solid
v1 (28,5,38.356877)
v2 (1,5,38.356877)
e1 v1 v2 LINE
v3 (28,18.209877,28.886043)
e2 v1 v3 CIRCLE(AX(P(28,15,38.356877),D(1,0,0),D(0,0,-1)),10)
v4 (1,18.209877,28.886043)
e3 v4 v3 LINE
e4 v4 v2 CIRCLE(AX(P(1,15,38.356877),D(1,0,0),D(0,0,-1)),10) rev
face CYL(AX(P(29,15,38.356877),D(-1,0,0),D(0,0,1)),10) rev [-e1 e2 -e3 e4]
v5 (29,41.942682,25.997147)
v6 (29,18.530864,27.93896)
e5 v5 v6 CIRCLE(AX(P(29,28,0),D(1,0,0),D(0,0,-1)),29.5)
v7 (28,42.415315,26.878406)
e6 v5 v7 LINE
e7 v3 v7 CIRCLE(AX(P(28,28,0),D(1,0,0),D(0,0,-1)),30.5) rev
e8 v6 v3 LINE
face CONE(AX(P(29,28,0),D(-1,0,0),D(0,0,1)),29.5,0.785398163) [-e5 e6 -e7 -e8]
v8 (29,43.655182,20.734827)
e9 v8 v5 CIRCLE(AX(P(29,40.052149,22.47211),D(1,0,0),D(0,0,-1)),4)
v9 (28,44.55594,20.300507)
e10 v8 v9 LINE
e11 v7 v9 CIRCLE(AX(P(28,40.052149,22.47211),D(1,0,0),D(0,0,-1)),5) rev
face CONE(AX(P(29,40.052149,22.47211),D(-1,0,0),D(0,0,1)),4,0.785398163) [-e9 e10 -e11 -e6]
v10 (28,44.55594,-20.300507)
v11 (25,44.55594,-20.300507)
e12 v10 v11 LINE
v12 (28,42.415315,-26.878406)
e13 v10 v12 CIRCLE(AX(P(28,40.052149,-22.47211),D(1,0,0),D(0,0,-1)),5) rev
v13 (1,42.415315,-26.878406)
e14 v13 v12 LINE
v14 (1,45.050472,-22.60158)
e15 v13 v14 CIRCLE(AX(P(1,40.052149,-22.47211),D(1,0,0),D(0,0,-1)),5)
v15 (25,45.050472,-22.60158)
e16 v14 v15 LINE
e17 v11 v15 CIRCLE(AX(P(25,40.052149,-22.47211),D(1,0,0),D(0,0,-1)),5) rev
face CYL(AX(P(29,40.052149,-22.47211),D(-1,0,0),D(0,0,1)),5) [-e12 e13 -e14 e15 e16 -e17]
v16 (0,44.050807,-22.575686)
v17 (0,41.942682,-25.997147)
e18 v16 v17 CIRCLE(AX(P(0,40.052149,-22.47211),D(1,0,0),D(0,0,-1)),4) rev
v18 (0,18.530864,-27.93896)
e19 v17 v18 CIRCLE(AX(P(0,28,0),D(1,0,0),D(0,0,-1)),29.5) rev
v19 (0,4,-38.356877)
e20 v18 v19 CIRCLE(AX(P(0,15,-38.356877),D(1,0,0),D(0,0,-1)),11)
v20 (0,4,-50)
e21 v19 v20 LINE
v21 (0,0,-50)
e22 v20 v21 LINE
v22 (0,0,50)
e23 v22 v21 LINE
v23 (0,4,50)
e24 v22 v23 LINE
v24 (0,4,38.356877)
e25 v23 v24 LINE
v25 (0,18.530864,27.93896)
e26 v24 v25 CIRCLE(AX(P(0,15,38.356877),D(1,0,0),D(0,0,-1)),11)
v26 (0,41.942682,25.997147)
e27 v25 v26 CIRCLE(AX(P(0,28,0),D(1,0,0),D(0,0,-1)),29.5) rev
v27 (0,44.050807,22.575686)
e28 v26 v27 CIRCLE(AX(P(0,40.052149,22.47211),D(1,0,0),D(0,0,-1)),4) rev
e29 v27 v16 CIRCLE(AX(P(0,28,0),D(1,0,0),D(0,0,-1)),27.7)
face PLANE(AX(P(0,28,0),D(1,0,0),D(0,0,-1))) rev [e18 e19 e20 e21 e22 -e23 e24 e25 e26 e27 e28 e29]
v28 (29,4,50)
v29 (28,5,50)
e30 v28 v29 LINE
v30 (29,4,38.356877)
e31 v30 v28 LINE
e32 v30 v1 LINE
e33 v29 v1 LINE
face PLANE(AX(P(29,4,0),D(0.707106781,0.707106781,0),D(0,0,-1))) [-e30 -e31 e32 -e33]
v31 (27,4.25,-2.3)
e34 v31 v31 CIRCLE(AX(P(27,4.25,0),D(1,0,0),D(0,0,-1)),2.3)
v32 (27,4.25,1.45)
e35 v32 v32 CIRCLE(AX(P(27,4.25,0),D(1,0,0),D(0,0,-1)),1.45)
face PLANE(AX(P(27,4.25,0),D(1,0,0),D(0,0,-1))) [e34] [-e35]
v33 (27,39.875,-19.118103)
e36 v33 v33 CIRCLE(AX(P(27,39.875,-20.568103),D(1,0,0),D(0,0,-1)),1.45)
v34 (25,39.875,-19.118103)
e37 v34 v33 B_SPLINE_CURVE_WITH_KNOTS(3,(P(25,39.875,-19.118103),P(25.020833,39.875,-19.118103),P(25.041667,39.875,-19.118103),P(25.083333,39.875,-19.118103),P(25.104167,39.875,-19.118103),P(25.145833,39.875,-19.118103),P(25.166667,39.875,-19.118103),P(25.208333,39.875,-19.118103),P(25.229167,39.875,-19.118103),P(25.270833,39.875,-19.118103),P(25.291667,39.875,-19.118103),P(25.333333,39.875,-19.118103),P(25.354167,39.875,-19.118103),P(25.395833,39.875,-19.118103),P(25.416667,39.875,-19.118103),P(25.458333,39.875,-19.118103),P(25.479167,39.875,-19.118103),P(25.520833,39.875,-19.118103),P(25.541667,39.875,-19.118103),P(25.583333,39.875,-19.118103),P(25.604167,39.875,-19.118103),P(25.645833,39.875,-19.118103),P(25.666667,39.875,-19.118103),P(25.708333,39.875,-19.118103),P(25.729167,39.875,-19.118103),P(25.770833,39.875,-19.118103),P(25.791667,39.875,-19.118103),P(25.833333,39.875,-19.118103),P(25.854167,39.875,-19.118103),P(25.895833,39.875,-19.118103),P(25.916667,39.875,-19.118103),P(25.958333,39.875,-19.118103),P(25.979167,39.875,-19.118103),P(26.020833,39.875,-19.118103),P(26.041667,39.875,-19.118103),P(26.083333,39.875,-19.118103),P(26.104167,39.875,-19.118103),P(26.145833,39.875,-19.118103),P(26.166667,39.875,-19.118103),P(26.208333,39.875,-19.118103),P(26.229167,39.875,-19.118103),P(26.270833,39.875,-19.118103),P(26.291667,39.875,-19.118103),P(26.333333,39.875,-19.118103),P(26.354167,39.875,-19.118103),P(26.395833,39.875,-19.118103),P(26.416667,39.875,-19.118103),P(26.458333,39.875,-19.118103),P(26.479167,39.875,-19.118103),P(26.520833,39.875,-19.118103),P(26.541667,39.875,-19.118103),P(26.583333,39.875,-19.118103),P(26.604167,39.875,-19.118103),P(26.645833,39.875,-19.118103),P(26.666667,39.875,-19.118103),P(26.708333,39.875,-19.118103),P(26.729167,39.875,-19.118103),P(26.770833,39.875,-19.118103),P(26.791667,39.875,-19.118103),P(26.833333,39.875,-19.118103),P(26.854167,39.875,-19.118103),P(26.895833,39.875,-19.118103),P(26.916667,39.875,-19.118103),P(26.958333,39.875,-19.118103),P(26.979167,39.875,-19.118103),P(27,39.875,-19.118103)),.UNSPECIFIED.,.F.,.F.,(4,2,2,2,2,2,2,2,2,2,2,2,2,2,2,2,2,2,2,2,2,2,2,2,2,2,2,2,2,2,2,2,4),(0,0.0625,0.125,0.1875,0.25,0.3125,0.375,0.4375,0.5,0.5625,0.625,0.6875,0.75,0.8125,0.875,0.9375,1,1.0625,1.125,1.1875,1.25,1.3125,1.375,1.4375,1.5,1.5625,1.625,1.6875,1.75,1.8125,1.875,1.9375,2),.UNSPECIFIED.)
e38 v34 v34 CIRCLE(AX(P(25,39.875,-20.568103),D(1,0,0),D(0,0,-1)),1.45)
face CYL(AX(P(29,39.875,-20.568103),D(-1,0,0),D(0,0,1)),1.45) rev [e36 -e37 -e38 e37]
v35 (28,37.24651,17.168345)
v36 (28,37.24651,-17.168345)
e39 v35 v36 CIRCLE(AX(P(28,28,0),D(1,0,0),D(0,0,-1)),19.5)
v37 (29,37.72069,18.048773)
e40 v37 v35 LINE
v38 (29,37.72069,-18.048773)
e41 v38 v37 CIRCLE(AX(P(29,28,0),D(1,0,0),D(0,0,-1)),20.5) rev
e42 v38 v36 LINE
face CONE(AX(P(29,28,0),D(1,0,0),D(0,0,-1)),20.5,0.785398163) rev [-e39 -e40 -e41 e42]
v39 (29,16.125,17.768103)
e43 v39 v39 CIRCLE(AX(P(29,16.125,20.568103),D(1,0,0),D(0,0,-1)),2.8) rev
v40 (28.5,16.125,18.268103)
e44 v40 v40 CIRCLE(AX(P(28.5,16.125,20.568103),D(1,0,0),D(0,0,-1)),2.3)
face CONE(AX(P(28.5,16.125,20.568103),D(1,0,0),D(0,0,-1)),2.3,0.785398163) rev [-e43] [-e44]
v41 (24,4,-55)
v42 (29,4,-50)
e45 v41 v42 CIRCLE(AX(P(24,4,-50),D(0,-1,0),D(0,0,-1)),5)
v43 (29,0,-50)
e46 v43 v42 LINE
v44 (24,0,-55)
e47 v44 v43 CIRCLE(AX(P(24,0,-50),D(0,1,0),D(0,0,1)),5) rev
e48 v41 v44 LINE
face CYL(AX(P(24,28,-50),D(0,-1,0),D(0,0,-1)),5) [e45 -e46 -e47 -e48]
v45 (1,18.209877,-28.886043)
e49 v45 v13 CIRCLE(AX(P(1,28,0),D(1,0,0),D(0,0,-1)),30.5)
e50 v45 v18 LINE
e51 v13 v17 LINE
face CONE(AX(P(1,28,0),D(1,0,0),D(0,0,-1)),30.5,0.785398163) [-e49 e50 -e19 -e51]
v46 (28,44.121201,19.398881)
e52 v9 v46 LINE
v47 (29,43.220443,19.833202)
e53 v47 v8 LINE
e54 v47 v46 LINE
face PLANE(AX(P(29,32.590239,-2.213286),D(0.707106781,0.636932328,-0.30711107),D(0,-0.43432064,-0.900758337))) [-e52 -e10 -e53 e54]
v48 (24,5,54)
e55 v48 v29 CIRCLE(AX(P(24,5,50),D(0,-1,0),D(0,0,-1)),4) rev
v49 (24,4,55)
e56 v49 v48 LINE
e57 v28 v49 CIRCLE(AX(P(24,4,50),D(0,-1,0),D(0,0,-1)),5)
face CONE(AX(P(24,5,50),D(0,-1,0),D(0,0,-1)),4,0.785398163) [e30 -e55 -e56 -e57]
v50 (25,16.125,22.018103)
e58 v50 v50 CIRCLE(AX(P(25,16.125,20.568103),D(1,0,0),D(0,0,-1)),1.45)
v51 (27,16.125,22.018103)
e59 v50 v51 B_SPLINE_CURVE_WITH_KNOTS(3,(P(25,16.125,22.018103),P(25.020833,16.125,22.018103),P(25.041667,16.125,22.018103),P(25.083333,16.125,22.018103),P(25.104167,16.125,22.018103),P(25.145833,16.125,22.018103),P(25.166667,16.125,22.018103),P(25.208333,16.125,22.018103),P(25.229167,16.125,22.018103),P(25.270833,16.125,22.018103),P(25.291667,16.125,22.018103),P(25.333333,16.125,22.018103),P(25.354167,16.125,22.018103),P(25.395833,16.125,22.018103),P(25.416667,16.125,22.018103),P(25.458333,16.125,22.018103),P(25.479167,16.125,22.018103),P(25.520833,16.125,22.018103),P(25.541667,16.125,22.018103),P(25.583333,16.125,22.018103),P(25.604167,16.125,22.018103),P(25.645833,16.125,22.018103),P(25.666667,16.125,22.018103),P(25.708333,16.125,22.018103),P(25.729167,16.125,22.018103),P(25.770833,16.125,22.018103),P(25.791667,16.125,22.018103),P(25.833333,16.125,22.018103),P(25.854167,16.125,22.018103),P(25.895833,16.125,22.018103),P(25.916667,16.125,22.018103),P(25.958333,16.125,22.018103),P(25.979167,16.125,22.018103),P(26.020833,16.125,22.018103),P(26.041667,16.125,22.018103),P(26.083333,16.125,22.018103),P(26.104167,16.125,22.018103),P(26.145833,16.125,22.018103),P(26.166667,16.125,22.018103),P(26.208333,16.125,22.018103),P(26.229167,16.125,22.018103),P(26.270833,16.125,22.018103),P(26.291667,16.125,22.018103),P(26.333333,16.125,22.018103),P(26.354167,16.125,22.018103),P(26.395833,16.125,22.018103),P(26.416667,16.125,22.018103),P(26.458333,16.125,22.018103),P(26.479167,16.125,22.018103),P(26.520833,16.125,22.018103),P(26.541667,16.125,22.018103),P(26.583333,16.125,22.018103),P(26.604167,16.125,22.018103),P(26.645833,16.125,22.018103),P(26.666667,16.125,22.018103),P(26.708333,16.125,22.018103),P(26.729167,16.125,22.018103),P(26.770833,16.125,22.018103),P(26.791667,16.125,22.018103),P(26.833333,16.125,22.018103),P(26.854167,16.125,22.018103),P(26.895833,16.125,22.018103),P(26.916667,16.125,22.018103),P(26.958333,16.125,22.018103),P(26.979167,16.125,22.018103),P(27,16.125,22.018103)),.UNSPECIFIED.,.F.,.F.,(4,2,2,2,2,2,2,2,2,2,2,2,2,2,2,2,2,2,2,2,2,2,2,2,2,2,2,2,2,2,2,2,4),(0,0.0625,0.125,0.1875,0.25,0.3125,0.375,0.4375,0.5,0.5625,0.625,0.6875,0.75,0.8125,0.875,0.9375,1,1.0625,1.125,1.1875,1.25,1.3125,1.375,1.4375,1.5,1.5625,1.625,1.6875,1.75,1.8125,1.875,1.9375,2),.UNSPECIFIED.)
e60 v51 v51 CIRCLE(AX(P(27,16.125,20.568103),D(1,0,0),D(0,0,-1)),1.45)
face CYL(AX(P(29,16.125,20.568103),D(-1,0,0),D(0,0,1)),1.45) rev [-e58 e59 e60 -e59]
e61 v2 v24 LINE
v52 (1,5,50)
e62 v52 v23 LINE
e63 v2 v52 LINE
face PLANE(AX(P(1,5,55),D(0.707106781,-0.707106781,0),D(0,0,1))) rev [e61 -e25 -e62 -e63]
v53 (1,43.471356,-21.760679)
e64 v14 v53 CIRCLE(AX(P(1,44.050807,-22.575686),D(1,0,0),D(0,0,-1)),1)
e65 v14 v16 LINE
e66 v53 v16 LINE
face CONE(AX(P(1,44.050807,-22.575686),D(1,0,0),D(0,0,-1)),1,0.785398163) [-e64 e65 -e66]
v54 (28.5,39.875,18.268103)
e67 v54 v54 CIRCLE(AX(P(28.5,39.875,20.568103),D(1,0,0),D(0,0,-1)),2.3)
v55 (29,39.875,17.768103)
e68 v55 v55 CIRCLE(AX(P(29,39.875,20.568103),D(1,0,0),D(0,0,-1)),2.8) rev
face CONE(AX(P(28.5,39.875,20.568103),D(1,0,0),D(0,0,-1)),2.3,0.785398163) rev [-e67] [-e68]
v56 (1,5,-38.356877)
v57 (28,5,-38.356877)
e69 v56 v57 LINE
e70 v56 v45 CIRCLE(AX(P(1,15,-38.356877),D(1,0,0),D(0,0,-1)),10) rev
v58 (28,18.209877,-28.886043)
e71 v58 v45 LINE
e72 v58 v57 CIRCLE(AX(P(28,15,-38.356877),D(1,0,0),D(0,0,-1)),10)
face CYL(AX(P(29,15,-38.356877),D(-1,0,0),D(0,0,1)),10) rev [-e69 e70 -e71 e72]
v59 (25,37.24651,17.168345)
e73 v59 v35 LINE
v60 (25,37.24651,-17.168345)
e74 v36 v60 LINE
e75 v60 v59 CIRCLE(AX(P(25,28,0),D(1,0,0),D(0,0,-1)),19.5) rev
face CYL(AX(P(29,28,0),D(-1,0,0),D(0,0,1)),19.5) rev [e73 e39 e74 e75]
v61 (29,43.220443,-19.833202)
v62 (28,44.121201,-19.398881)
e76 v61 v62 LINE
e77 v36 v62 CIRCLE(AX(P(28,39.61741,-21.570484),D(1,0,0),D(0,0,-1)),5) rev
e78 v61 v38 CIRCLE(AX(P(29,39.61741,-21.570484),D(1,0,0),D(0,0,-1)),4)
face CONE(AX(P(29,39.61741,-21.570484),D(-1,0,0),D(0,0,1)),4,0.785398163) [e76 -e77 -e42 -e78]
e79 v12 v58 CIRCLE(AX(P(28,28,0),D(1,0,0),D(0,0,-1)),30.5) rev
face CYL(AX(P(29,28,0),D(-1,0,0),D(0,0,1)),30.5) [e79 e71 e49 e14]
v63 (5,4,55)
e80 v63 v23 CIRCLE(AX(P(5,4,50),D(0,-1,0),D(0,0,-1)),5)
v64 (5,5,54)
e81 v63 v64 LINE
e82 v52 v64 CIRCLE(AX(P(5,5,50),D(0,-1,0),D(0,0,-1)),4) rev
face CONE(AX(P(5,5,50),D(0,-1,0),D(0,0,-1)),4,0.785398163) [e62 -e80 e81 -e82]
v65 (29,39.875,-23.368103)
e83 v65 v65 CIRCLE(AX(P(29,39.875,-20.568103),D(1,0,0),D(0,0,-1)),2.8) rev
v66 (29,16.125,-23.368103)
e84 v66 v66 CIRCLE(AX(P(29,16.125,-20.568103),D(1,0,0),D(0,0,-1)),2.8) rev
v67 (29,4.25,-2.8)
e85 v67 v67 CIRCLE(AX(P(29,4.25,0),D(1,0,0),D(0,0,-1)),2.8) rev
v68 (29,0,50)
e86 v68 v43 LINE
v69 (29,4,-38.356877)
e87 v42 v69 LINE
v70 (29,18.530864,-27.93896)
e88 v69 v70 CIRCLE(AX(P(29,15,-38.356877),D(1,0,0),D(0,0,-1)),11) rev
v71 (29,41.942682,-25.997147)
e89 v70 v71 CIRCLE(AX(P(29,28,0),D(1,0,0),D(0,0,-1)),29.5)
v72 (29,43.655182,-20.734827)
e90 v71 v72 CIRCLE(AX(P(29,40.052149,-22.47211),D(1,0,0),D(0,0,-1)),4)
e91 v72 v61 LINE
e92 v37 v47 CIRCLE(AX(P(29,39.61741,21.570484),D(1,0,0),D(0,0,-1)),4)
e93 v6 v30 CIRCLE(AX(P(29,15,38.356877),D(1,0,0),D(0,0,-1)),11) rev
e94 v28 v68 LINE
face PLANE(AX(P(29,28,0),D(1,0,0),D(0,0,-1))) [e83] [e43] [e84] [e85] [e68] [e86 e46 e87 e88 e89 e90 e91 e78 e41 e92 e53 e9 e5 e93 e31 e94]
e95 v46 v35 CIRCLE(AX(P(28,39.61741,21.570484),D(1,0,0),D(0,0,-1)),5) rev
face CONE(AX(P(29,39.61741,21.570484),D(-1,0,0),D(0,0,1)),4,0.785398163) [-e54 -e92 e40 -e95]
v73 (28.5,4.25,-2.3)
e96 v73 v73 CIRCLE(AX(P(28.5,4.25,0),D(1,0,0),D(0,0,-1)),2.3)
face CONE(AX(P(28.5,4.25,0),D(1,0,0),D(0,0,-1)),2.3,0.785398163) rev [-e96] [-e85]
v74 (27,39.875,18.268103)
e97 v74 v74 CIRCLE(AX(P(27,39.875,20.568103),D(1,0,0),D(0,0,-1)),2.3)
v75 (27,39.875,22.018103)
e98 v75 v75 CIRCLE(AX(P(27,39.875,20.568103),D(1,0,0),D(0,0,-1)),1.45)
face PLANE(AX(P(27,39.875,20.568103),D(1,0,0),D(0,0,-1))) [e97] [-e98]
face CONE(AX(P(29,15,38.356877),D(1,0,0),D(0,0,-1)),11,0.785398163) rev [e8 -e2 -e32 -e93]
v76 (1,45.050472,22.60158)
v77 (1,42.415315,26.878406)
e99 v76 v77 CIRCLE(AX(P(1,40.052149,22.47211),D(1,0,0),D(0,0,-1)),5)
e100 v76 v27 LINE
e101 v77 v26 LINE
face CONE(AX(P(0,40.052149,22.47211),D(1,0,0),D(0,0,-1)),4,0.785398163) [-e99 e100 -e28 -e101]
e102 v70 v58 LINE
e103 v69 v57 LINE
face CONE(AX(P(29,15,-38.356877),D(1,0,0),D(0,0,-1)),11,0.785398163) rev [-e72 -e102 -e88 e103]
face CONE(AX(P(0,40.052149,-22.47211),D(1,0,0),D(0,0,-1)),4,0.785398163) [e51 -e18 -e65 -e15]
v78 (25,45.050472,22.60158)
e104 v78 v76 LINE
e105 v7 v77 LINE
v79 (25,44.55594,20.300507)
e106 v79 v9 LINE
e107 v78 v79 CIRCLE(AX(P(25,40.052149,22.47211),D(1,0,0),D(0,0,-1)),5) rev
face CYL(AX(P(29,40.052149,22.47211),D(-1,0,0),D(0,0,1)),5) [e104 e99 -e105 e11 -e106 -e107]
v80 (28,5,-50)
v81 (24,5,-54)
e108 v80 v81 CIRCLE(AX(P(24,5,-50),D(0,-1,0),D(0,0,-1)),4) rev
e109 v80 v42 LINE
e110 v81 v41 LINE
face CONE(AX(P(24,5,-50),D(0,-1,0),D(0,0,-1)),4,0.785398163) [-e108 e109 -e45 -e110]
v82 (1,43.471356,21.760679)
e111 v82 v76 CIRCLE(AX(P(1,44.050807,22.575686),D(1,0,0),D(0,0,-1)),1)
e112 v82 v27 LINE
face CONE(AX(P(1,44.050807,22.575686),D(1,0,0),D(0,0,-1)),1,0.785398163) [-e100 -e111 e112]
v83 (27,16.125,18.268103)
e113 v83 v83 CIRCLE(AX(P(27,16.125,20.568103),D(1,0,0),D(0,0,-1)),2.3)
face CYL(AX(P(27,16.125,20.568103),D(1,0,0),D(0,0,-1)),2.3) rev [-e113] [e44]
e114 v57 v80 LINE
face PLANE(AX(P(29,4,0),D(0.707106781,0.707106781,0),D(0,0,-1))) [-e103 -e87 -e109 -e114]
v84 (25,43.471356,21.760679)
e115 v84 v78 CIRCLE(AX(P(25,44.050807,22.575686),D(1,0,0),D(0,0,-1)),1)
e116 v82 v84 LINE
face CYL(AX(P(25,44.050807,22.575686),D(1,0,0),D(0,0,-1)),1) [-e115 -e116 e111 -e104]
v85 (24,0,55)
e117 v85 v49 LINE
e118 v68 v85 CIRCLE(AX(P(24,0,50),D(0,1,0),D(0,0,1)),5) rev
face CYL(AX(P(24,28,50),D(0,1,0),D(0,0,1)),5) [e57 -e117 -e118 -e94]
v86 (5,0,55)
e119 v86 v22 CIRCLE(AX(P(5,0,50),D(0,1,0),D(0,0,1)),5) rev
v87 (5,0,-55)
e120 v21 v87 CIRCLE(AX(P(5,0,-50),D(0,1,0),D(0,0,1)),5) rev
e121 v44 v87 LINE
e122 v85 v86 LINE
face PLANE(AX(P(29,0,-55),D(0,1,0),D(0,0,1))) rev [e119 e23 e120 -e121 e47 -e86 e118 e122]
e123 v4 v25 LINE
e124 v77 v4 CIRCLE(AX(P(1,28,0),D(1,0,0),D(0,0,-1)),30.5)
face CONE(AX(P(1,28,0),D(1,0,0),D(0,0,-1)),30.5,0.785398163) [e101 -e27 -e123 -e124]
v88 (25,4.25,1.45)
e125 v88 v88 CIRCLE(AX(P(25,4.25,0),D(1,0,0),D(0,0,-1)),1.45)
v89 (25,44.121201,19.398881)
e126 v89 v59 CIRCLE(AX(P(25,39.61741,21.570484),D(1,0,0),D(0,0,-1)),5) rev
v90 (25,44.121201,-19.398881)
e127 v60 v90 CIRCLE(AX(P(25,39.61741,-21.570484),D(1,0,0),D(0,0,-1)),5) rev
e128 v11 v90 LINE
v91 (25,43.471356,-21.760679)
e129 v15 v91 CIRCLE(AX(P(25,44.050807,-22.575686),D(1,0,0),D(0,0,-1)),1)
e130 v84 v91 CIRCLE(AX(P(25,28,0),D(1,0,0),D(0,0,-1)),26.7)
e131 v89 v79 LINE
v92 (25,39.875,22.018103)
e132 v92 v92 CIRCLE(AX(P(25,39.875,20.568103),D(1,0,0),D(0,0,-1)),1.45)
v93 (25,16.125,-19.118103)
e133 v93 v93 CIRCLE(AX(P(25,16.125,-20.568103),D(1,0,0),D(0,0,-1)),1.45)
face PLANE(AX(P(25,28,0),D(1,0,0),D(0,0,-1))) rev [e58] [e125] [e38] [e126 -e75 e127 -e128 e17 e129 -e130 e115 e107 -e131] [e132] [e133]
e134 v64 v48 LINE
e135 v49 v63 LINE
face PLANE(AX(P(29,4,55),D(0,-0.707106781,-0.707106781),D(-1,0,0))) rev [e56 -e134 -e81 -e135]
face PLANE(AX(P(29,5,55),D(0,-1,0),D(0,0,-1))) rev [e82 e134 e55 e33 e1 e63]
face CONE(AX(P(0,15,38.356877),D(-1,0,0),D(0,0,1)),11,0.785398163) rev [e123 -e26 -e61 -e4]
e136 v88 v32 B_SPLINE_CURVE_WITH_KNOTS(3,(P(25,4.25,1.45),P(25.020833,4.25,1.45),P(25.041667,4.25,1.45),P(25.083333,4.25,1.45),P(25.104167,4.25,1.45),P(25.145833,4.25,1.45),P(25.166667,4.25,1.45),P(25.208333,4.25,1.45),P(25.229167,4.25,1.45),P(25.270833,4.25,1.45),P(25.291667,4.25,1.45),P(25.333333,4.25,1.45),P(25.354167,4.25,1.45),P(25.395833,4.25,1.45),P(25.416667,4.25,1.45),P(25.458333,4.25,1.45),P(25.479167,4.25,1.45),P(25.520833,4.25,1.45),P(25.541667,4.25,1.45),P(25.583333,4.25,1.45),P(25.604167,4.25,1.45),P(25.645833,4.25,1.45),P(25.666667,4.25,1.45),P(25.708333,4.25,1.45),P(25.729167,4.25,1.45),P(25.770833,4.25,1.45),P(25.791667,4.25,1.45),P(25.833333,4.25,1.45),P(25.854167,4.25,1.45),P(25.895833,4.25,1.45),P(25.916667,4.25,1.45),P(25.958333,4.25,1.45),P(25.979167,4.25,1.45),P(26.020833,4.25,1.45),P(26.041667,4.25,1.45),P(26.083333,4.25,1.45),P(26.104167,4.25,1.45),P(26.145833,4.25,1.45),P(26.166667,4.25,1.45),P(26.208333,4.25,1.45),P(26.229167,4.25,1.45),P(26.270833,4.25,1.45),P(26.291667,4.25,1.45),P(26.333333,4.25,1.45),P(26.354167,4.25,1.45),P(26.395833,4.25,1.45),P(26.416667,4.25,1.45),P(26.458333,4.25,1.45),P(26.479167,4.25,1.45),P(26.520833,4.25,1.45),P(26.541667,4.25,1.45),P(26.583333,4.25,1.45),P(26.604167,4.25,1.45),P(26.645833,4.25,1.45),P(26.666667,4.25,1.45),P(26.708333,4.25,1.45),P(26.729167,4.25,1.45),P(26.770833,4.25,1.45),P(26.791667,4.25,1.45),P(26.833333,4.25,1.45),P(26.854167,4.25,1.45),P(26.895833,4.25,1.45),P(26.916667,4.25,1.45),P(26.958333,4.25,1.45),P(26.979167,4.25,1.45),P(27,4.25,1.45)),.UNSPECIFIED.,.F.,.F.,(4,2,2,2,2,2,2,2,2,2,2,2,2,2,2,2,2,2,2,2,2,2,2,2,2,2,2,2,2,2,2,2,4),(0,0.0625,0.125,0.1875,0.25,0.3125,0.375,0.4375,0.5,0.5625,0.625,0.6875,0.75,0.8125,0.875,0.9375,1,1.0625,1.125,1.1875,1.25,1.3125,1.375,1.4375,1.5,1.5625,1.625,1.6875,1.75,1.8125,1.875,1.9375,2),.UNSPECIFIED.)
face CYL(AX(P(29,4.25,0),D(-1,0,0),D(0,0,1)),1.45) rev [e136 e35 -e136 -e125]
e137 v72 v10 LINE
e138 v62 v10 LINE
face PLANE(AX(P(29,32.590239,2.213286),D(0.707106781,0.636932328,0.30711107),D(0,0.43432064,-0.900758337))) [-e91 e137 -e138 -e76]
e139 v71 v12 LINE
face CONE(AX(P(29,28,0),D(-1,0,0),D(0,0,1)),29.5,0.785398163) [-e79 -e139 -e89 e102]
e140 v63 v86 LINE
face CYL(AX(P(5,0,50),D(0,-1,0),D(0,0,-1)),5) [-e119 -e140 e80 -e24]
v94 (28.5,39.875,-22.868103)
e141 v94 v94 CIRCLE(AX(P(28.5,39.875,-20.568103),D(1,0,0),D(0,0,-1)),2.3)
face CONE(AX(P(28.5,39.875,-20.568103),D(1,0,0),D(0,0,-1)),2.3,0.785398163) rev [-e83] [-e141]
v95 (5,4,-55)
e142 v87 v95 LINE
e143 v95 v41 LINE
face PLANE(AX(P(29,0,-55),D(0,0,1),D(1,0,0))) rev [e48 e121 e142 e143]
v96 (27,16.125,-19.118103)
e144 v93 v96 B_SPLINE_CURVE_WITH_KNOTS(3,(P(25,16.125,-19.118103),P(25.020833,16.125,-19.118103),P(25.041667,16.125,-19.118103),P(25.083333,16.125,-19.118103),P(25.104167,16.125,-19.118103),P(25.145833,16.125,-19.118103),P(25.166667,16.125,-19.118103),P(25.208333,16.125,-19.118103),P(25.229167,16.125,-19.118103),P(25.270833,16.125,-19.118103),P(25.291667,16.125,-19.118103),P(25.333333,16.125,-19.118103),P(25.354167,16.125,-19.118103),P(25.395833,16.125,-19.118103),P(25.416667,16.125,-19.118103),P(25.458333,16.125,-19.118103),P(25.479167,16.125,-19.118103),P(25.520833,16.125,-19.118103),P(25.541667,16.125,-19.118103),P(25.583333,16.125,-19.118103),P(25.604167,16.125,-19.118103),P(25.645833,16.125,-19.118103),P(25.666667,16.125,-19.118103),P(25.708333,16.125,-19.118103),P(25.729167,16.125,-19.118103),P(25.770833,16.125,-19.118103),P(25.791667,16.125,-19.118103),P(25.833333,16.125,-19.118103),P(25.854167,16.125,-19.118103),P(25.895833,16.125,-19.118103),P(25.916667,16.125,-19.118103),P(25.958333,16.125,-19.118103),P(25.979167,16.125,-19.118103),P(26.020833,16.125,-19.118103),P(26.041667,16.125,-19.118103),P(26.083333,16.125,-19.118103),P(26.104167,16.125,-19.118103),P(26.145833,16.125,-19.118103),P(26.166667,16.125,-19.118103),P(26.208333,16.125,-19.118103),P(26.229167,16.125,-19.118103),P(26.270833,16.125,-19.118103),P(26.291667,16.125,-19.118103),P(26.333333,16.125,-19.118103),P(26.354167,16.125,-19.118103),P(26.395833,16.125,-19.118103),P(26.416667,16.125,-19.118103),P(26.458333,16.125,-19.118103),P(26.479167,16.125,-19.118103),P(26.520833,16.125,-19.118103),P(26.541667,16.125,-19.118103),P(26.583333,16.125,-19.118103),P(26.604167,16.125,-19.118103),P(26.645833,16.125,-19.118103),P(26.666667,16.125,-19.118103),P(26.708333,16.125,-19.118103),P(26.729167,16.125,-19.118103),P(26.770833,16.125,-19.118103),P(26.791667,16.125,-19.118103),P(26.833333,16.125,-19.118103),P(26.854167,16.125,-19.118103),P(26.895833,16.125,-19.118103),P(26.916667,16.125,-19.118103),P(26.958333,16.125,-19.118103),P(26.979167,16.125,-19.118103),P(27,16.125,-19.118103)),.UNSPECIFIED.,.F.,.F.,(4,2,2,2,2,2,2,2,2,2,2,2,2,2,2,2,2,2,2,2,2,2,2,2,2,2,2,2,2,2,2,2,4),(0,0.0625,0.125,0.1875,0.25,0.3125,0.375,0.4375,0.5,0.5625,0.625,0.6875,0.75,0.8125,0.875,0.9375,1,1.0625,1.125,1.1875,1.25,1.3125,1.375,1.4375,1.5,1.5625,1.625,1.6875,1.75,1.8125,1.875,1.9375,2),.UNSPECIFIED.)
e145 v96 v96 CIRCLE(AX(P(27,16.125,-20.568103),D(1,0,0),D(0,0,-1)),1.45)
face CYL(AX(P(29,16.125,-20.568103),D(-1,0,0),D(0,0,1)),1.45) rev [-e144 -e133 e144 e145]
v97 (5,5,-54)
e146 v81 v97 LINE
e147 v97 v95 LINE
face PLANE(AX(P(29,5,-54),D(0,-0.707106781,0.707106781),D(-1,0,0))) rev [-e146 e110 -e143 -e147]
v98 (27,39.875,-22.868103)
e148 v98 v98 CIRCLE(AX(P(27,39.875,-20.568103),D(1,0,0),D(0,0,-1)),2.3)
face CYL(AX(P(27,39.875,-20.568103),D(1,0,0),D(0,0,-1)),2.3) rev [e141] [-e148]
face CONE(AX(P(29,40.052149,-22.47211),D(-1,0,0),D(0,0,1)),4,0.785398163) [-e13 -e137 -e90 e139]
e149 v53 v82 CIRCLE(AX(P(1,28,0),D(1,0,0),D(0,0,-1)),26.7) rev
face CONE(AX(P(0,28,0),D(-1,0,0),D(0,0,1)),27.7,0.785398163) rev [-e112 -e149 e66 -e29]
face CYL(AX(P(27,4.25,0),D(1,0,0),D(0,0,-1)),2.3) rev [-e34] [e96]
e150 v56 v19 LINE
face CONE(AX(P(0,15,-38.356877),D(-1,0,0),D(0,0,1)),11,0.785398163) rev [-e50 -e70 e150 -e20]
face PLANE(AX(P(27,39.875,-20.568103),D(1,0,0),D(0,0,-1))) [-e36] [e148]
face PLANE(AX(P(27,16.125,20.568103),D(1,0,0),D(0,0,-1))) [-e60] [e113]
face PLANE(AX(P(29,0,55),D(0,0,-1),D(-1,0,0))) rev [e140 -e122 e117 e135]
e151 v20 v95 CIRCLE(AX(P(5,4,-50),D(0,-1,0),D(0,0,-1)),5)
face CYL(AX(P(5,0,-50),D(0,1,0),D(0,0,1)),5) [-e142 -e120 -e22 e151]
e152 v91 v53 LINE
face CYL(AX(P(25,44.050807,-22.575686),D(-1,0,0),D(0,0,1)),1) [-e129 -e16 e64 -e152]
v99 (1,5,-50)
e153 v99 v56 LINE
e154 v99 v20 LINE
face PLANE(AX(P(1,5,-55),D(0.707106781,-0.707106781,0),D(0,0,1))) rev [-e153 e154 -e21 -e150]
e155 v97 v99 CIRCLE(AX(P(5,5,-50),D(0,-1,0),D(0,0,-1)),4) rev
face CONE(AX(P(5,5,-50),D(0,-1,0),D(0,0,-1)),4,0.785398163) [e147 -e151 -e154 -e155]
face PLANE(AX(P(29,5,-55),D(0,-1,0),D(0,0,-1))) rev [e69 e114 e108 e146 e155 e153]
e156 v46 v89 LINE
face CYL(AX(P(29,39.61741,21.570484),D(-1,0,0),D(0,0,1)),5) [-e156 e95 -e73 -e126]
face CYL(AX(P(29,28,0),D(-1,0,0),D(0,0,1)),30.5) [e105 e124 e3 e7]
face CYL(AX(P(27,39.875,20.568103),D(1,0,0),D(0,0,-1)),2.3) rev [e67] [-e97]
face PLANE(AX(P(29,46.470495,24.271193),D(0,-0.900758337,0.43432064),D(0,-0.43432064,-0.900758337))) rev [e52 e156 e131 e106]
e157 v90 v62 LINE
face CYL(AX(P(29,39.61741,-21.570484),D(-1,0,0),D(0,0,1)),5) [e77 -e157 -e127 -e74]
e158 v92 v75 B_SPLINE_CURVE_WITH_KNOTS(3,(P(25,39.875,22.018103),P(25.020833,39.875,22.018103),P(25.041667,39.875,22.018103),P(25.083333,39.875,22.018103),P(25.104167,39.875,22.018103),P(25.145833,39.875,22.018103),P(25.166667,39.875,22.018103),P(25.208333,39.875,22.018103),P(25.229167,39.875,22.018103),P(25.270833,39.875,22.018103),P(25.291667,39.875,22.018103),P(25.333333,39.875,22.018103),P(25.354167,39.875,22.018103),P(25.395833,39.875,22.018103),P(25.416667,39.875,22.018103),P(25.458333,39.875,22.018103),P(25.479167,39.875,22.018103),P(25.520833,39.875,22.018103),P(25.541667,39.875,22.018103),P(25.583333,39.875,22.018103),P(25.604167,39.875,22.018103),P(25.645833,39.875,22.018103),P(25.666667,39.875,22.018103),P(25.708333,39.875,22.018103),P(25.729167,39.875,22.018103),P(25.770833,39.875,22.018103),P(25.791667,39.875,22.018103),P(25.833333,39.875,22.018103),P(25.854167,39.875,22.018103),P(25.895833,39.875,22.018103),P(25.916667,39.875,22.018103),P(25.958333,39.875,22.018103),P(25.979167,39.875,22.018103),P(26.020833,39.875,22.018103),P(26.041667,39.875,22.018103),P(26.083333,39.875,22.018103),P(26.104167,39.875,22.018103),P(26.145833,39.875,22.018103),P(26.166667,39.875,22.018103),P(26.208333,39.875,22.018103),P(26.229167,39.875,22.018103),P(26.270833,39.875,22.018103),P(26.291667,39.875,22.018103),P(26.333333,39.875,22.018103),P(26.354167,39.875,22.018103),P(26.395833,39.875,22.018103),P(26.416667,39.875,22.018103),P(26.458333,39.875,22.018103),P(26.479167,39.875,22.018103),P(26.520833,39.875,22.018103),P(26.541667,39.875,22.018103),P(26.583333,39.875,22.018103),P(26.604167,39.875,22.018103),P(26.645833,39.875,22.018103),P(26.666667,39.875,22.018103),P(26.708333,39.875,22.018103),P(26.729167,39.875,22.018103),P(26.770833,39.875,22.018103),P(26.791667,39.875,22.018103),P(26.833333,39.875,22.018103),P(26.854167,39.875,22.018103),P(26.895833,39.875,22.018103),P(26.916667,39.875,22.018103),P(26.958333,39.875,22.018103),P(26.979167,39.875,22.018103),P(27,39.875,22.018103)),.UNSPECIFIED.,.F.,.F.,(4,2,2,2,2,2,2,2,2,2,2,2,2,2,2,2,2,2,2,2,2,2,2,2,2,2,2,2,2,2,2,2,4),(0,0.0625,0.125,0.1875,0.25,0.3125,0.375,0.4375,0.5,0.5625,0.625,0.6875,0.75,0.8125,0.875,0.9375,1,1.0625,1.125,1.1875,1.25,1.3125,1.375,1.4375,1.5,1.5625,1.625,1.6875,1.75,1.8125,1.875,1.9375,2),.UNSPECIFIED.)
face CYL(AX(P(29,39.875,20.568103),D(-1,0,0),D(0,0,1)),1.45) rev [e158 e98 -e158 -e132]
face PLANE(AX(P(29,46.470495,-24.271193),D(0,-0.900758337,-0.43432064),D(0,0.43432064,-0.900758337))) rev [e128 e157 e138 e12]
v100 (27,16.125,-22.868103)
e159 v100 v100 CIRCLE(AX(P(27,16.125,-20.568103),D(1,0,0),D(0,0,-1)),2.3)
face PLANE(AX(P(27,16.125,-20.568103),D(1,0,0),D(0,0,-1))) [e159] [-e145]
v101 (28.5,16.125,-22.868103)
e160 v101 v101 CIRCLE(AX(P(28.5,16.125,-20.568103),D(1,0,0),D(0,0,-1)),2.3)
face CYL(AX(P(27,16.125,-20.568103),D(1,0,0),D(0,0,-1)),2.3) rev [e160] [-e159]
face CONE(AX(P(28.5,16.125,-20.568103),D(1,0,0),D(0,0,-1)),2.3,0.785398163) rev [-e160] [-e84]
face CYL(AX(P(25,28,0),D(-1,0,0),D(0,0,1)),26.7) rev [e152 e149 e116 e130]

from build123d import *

# Parameters (mm, degrees)
SKETCH1_R           = 1.45
BOSS_EXTRUDE1_DEPTH = 29
FILLET1_R           = 10
FILLET2_R           = 5
SKETCH2_R           = 26.7
CUT_EXTRUDE1_DEPTH  = 25
FILLET3_R           = 1
FILLET4_R           = 5
SKETCH3_R           = 2.3
CUT_EXTRUDE2_DEPTH  = 2
CHAMFER2_SIZE       = 0.5


with BuildPart() as part:
    # Sketch1 → Boss-Extrude1 (new body)
    with BuildSketch(Plane(origin=(0, 0, 0), x_dir=(0, 0, -1), z_dir=(1, 0, 0))):
        with BuildLine():
            Line((55, 0), (-55, 0))
            Line((-55, 0), (-55, 5))
            Line((-55, 5), (-20.031225624, 5))
            ThreePointArc((-20.031225624, 5), (-30.341828635, 24.897833805), (-24.271193132, 46.470494957))
            Line((-24.271193132, 46.470494957), (-14.03683849, 41.535773536))
            ThreePointArc((-14.03683849, 41.535773536), (0, 8.5), (14.03683849, 41.535773536))
            Line((14.03683849, 41.535773536), (24.271193132, 46.470494957))
            ThreePointArc((24.271193132, 46.470494957), (30.341828635, 24.897833805), (20.031225624, 5))
            Line((20.031225624, 5), (55, 5))
            Line((55, 5), (55, 0))
        make_face()
        with Locations(Location((-20.56810334, 16.125, 0), (0, 0, 180))):
            Circle(SKETCH1_R, mode=Mode.SUBTRACT)
        with Locations(Location((20.56810334, 16.125, 0), (0, 0, 180))):
            Circle(SKETCH1_R, mode=Mode.SUBTRACT)
        with Locations(Location((0, 4.25, 0), (0, 0, 180))):
            Circle(SKETCH1_R, mode=Mode.SUBTRACT)
        with Locations(Location((-20.56810334, 39.875, 0), (0, 0, 180))):
            Circle(SKETCH1_R, mode=Mode.SUBTRACT)
        with Locations(Location((20.56810334, 39.875, 0), (0, 0, 180))):
            Circle(SKETCH1_R, mode=Mode.SUBTRACT)
    extrude(amount=BOSS_EXTRUDE1_DEPTH)

    # Fillet1
    fillet1_edges = [part.edges().sort_by_distance(p)[0] for p in [
        (14.5, 5, 20.031225624),
        (14.5, 5, -20.031225624),
    ]]
    fillet(fillet1_edges, radius=FILLET1_R)

    # Fillet2
    fillet2_edges = [part.edges().sort_by_distance(p)[0] for p in [
        (14.5, 46.470494957, 24.271193132),
        (14.5, 41.535773536, 14.03683849),
        (14.5, 41.535773536, -14.03683849),
        (14.5, 46.470494957, -24.271193132),
    ]]
    fillet(fillet2_edges, radius=FILLET2_R)

    # Sketch2 → Cut-Extrude1 (cut)
    with BuildSketch(Plane(origin=(0, 0, 0), x_dir=(0, 0, -1), z_dir=(1, 0, 0))):
        with Locations((0, 28)):
            Circle(SKETCH2_R)
    extrude(amount=CUT_EXTRUDE1_DEPTH, mode=Mode.SUBTRACT)

    # Fillet3
    fillet3_edges = [part.edges().sort_by_distance(p)[0] for p in [
        (12.5, 44.758999735, -20.785233409),
        (12.5, 44.758999735, 20.785233409),
    ]]
    fillet(fillet3_edges, radius=FILLET3_R)

    # Fillet4
    fillet4_edges = [part.edges().sort_by_distance(p)[0] for p in [
        (29, 2.5, -55),
        (0, 2.5, -55),
        (0, 2.5, 55),
        (29, 2.5, 55),
    ]]
    fillet(fillet4_edges, radius=FILLET4_R)

    # Sketch3 → Cut-Extrude2 (cut)
    with BuildSketch(Plane(origin=(29, 0, 0), x_dir=(0, 0, -1), z_dir=(1, 0, 0))):
        with Locations((-20.56810334, 39.875)):
            Circle(SKETCH3_R)
        with Locations((-20.56810334, 16.125)):
            Circle(SKETCH3_R)
        with Locations((0, 4.25)):
            Circle(SKETCH3_R)
        with Locations((20.56810334, 16.125)):
            Circle(SKETCH3_R)
        with Locations((20.56810334, 39.875)):
            Circle(SKETCH3_R)
    extrude(amount=-CUT_EXTRUDE2_DEPTH, mode=Mode.SUBTRACT)

    # Chamfer1
    # the kernel refuses this chamfer: 1 mm, written as the material it takes off along each edge
    with BuildSketch(Plane(origin=(0, 28, 0), x_dir=(0, 0.5794515273232917, 0.815006703949547), z_dir=(0, 0.815006703949547, -0.5794515273232917))) as chamfer1_piece_1:
        with BuildLine():
            Line((27.728284271, -0.028284271), (26.671715729, 1.028284271))
            Line((26.671715729, 1.028284271), (26.651715729, 1.028284271))
            ThreePointArc((26.651715729, 1.028284271), (26.68, 0.514142136), (26.68, 0))
            Line((26.68, 0), (26.7, -0.02))
            ThreePointArc((26.7, -0.02), (27.214142136, -0.02), (27.728284271, -0.048284271))
            Line((27.728284271, -0.048284271), (27.728284271, -0.028284271))
        make_face()
    revolve(axis=Axis((0, 28, 0), (1, 0, 0)), revolution_arc=250.823950469, mode=Mode.SUBTRACT)
    with BuildSketch(Plane(origin=(0, 40.052148529, -22.472109732), x_dir=(0, 0.4726332756600554, -0.8812592051938215), z_dir=(0, -0.8812592051938215, -0.4726332756600554))) as chamfer1_piece_2:
        with BuildLine():
            Line((3.971715729, -0.028284271), (5.028284271, 1.028284271))
            Line((5.028284271, 1.028284271), (5.048284271, 1.028284271))
            ThreePointArc((5.048284271, 1.028284271), (5.02, 0.514142136), (5.02, 0))
            Line((5.02, 0), (5, -0.02))
            ThreePointArc((5, -0.02), (4.485857864, -0.02), (3.971715729, -0.048284271))
            Line((3.971715729, -0.048284271), (3.971715729, -0.028284271))
        make_face()
    revolve(axis=Axis((0, 40.052148529, -22.472109732), (1, 0, 0)), revolution_arc=60.310853344, mode=Mode.SUBTRACT)
    with BuildSketch(Plane(origin=(0, 44.050807316, -22.575685682), x_dir=(0, -0.5794515416446061, 0.8150066937674127), z_dir=(0, -0.8150066937674127, -0.5794515416446061))) as chamfer1_piece_3:
        with BuildLine():
            Line((0, -9e-09), (1.028284251, -1.028284271))
            Line((1.028284251, -1.028284271), (1.048284251, -1.028284271))
            ThreePointArc((1.048284251, -1.028284271), (1.01999998, -0.514142136), (1.019999991, 0))
            Line((1.019999991, 0), (0.999999991, 0.02))
            Line((0.999999991, 0.02), (0, 0.047506276))
            Line((0, 0.047506276), (0, -9e-09))
        make_face()
    revolve(axis=Axis((0, 44.050807316, -22.575685682), (-1, 0, 0)), revolution_arc=126.895759533, mode=Mode.SUBTRACT)
    with BuildSketch(Plane(origin=(0, 44.050807316, 22.575685682), x_dir=(0, -0.5794515416446213, -0.815006693767402), z_dir=(0, -0.815006693767402, 0.5794515416446213))) as chamfer1_piece_4:
        with BuildLine():
            Line((0, 9e-09), (1.028284251, 1.028284271))
            Line((1.028284251, 1.028284271), (1.048284251, 1.028284271))
            ThreePointArc((1.048284251, 1.028284271), (1.01999998, 0.514142136), (1.019999991, 0))
            Line((1.019999991, 0), (0.999999991, -0.02))
            Line((0.999999991, -0.02), (0, -0.047506276))
            Line((0, -0.047506276), (0, 9e-09))
        make_face()
    revolve(axis=Axis((0, 44.050807316, 22.575685682), (1, 0, 0)), revolution_arc=126.895759533, mode=Mode.SUBTRACT)
    with BuildSketch(Plane(origin=(5, 5, -55), x_dir=(0, 0, 1), z_dir=(1, 0, 0))) as chamfer1_piece_5:
        with BuildLine():
            Line((1.028284271, -0.028284271), (-0.028284271, 1.028284271))
            Line((-0.028284271, 1.028284271), (-0.048284271, 1.028284271))
            ThreePointArc((-0.048284271, 1.028284271), (-0.02, 0.514142136), (-0.02, 0))
            Line((-0.02, 0), (0, -0.02))
            ThreePointArc((0, -0.02), (0.514142136, -0.02), (1.028284271, -0.048284271))
            Line((1.028284271, -0.048284271), (1.028284271, -0.028284271))
        make_face()
    extrude(amount=19, mode=Mode.SUBTRACT)
    with BuildSketch(Plane(origin=(0, 5, -38.356876828), x_dir=(0, -1, 0), z_dir=(0, 0, -1)), Plane(origin=(29, 5, -38.356876828), x_dir=(-1, 0, 0), z_dir=(0, 0, -1)), Plane(origin=(0, 5, 50), x_dir=(0, -1, 0), z_dir=(0, 0, -1)), Plane(origin=(29, 5, 50), x_dir=(-1, 0, 0), z_dir=(0, 0, -1))) as chamfer1_piece_6:
        with BuildLine():
            Line((1.028284271, 0.028284271), (-0.028284271, -1.028284271))
            Line((-0.028284271, -1.028284271), (-0.048284271, -1.028284271))
            ThreePointArc((-0.048284271, -1.028284271), (-0.02, -0.514142136), (-0.02, 0))
            Line((-0.02, 0), (0, 0.02))
            ThreePointArc((0, 0.02), (0.514142136, 0.02), (1.028284271, 0.048284271))
            Line((1.028284271, 0.048284271), (1.028284271, 0.028284271))
        make_face()
    extrude(amount=11.643123172, mode=Mode.SUBTRACT)
    with BuildSketch(Plane(origin=(24, 5, -50), x_dir=(1, 0, 0), z_dir=(0, 0, 1))) as chamfer1_piece_7:
        with BuildLine():
            Line((3.971715729, 0.028284271), (5.028284271, -1.028284271))
            Line((5.028284271, -1.028284271), (5.048284271, -1.028284271))
            ThreePointArc((5.048284271, -1.028284271), (5.02, -0.514142136), (5.02, 0))
            Line((5.02, 0), (5, 0.02))
            ThreePointArc((5, 0.02), (4.485857864, 0.02), (3.971715729, 0.048284271))
            Line((3.971715729, 0.048284271), (3.971715729, 0.028284271))
        make_face()
    revolve(axis=Axis((24, 5, -50), (0, 1, 0)), revolution_arc=90, mode=Mode.SUBTRACT)
    with BuildSketch(Plane(origin=(5, 5, -50), x_dir=(-1, 0, 0), z_dir=(0, 0, 1))) as chamfer1_piece_8:
        with BuildLine():
            Line((3.971715729, -0.028284271), (5.028284271, 1.028284271))
            Line((5.028284271, 1.028284271), (5.048284271, 1.028284271))
            ThreePointArc((5.048284271, 1.028284271), (5.02, 0.514142136), (5.02, 0))
            Line((5.02, 0), (5, -0.02))
            ThreePointArc((5, -0.02), (4.485857864, -0.02), (3.971715729, -0.048284271))
            Line((3.971715729, -0.048284271), (3.971715729, -0.028284271))
        make_face()
    revolve(axis=Axis((5, 5, -50), (0, -1, 0)), revolution_arc=90, mode=Mode.SUBTRACT)
    with BuildSketch(Plane(origin=(5, 5, 55), x_dir=(0, 0, -1), z_dir=(1, 0, 0))) as chamfer1_piece_9:
        with BuildLine():
            Line((1.028284271, 0.028284271), (-0.028284271, -1.028284271))
            Line((-0.028284271, -1.028284271), (-0.048284271, -1.028284271))
            ThreePointArc((-0.048284271, -1.028284271), (-0.02, -0.514142136), (-0.02, 0))
            Line((-0.02, 0), (0, 0.02))
            ThreePointArc((0, 0.02), (0.514142136, 0.02), (1.028284271, 0.048284271))
            Line((1.028284271, 0.048284271), (1.028284271, 0.028284271))
        make_face()
    extrude(amount=19, mode=Mode.SUBTRACT)
    with BuildSketch(Plane(origin=(24, 5, 50), x_dir=(1, 0, 0), z_dir=(0, 0, -1))) as chamfer1_piece_10:
        with BuildLine():
            Line((3.971715729, -0.028284271), (5.028284271, 1.028284271))
            Line((5.028284271, 1.028284271), (5.048284271, 1.028284271))
            ThreePointArc((5.048284271, 1.028284271), (5.02, 0.514142136), (5.02, 0))
            Line((5.02, 0), (5, -0.02))
            ThreePointArc((5, -0.02), (4.485857864, -0.02), (3.971715729, -0.048284271))
            Line((3.971715729, -0.048284271), (3.971715729, -0.028284271))
        make_face()
    revolve(axis=Axis((24, 5, 50), (0, -1, 0)), revolution_arc=90, mode=Mode.SUBTRACT)
    with BuildSketch(Plane(origin=(5, 5, 50), x_dir=(-1, 0, 0), z_dir=(0, 0, -1))) as chamfer1_piece_11:
        with BuildLine():
            Line((5.028284271, -1.028284271), (3.971715729, 0.028284271))
            Line((3.971715729, 0.028284271), (3.971715729, 0.048284271))
            ThreePointArc((3.971715729, 0.048284271), (4.485857864, 0.02), (5, 0.02))
            Line((5, 0.02), (5.02, 0))
            ThreePointArc((5.02, 0), (5.02, -0.514142136), (5.048284271, -1.028284271))
            Line((5.048284271, -1.028284271), (5.028284271, -1.028284271))
        make_face()
    revolve(axis=Axis((5, 5, 50), (0, 1, 0)), revolution_arc=90, mode=Mode.SUBTRACT)
    with BuildSketch(Plane(origin=(0, 28, 0), x_dir=(0, 0.4726332756600534, -0.8812592051938226), z_dir=(0, 0.8812592051938226, 0.4726332756600534))) as chamfer1_piece_12:
        with BuildLine():
            Line((29.471715729, 0.028284271), (30.528284271, -1.028284271))
            Line((30.528284271, -1.028284271), (30.548284271, -1.028284271))
            ThreePointArc((30.548284271, -1.028284271), (30.52, -0.514142136), (30.52, 0))
            Line((30.52, 0), (30.5, 0.02))
            ThreePointArc((30.5, 0.02), (29.985857864, 0.02), (29.471715729, 0.048284271))
            Line((29.471715729, 0.048284271), (29.471715729, 0.028284271))
        make_face()
    revolve(axis=Axis((0, 28, 0), (-1, 0, 0)), revolution_arc=46.928028915, mode=Mode.SUBTRACT)
    with BuildSketch(Plane(origin=(29, 28, 0), x_dir=(0, 0.4726332756600534, -0.8812592051938226), z_dir=(0, 0.8812592051938226, 0.4726332756600534))) as chamfer1_piece_13:
        with BuildLine():
            Line((30.528284271, 1.028284271), (29.471715729, -0.028284271))
            Line((29.471715729, -0.028284271), (29.471715729, -0.048284271))
            ThreePointArc((29.471715729, -0.048284271), (29.985857864, -0.02), (30.5, -0.02))
            Line((30.5, -0.02), (30.52, 0))
            ThreePointArc((30.52, 0), (30.52, 0.514142136), (30.548284271, 1.028284271))
            Line((30.548284271, 1.028284271), (30.528284271, 1.028284271))
        make_face()
    revolve(axis=Axis((29, 28, 0), (-1, 0, 0)), revolution_arc=46.928028915, mode=Mode.SUBTRACT)
    with BuildSketch(Plane(origin=(0, 15, 38.356876828), x_dir=(0, -1, 0), z_dir=(0, 0, 1))) as chamfer1_piece_14:
        with BuildLine():
            Line((11.028284271, -0.028284271), (9.971715729, 1.028284271))
            Line((9.971715729, 1.028284271), (9.951715729, 1.028284271))
            ThreePointArc((9.951715729, 1.028284271), (9.98, 0.514142136), (9.98, 0))
            Line((9.98, 0), (10, -0.02))
            ThreePointArc((10, -0.02), (10.514142136, -0.02), (11.028284271, -0.048284271))
            Line((11.028284271, -0.048284271), (11.028284271, -0.028284271))
        make_face()
    revolve(axis=Axis((0, 15, 38.356876828), (1, 0, 0)), revolution_arc=108.722664544, mode=Mode.SUBTRACT)
    with BuildSketch(Plane(origin=(29, 15, 38.356876828), x_dir=(0, -1, 0), z_dir=(0, 0, 1))) as chamfer1_piece_15:
        with BuildLine():
            Line((9.971715729, -1.028284271), (11.028284271, 0.028284271))
            Line((11.028284271, 0.028284271), (11.028284271, 0.048284271))
            ThreePointArc((11.028284271, 0.048284271), (10.514142136, 0.02), (10, 0.02))
            Line((10, 0.02), (9.98, 0))
            ThreePointArc((9.98, 0), (9.98, -0.514142136), (9.951715729, -1.028284271))
            Line((9.951715729, -1.028284271), (9.971715729, -1.028284271))
        make_face()
    revolve(axis=Axis((29, 15, 38.356876828), (1, 0, 0)), revolution_arc=108.722664544, mode=Mode.SUBTRACT)
    with BuildSketch(Plane(origin=(0, 15, -38.356876828), x_dir=(0, -1, 0), z_dir=(0, 0, -1))) as chamfer1_piece_16:
        with BuildLine():
            Line((11.028284271, 0.028284271), (9.971715729, -1.028284271))
            Line((9.971715729, -1.028284271), (9.951715729, -1.028284271))
            ThreePointArc((9.951715729, -1.028284271), (9.98, -0.514142136), (9.98, 0))
            Line((9.98, 0), (10, 0.02))
            ThreePointArc((10, 0.02), (10.514142136, 0.02), (11.028284271, 0.048284271))
            Line((11.028284271, 0.048284271), (11.028284271, 0.028284271))
        make_face()
    revolve(axis=Axis((0, 15, -38.356876828), (-1, 0, 0)), revolution_arc=108.722664544, mode=Mode.SUBTRACT)
    with BuildSketch(Plane(origin=(29, 15, -38.356876828), x_dir=(0, -1, 0), z_dir=(0, 0, -1))) as chamfer1_piece_17:
        with BuildLine():
            Line((9.971715729, 1.028284271), (11.028284271, -0.028284271))
            Line((11.028284271, -0.028284271), (11.028284271, -0.048284271))
            ThreePointArc((11.028284271, -0.048284271), (10.514142136, -0.02), (10, -0.02))
            Line((10, -0.02), (9.98, 0))
            ThreePointArc((9.98, 0), (9.98, 0.514142136), (9.951715729, 1.028284271))
            Line((9.951715729, 1.028284271), (9.971715729, 1.028284271))
        make_face()
    revolve(axis=Axis((29, 15, -38.356876828), (-1, 0, 0)), revolution_arc=108.722664544, mode=Mode.SUBTRACT)
    with BuildSketch(Plane(origin=(29, 44.121201454, -19.398881036), x_dir=(0, -0.9007583368811826, -0.4343206402406476), z_dir=(0, 0.4343206402406476, -0.9007583368811826)), Plane(origin=(29, 44.555940214, 20.300506531), x_dir=(0, -0.9007583368811826, 0.4343206402406476), z_dir=(0, -0.4343206402406476, -0.9007583368811826))) as chamfer1_piece_18:
        with BuildLine():
            Line((1.028284271, -0.028284271), (-0.028284271, 1.028284271))
            Line((-0.028284271, 1.028284271), (-0.048284271, 1.028284271))
            ThreePointArc((-0.048284271, 1.028284271), (-0.02, 0.514142136), (-0.02, 0))
            Line((-0.02, 0), (0, -0.02))
            ThreePointArc((0, -0.02), (0.514142136, -0.02), (1.028284271, -0.048284271))
            Line((1.028284271, -0.048284271), (1.028284271, -0.028284271))
        make_face()
    extrude(amount=1.000962698, mode=Mode.SUBTRACT)
    with BuildSketch(Plane(origin=(0, 28, 0), x_dir=(0, -0.3209876543209878, 0.9470833784696626), z_dir=(0, -0.9470833784696626, -0.3209876543209878))) as chamfer1_piece_19:
        with BuildLine():
            Line((29.471715729, 0.028284271), (30.528284271, -1.028284271))
            Line((30.528284271, -1.028284271), (30.548284271, -1.028284271))
            ThreePointArc((30.548284271, -1.028284271), (30.52, -0.514142136), (30.52, 0))
            Line((30.52, 0), (30.5, 0.02))
            ThreePointArc((30.5, 0.02), (29.985857864, 0.02), (29.471715729, 0.048284271))
            Line((29.471715729, 0.048284271), (29.471715729, 0.028284271))
        make_face()
    revolve(axis=Axis((0, 28, 0), (-1, 0, 0)), revolution_arc=46.928028915, mode=Mode.SUBTRACT)
    with BuildSketch(Plane(origin=(0, 40.052148529, 22.472109732), x_dir=(0, 0.9996646943809555, 0.02589399173999497), z_dir=(0, 0.02589399173999497, -0.9996646943809555))) as chamfer1_piece_20:
        with BuildLine():
            Line((3.971715729, -0.028284271), (5.028284271, 1.028284271))
            Line((5.028284271, 1.028284271), (5.048284271, 1.028284271))
            ThreePointArc((5.048284271, 1.028284271), (5.02, 0.514142136), (5.02, 0))
            Line((5.02, 0), (5, -0.02))
            ThreePointArc((5, -0.02), (4.485857864, -0.02), (3.971715729, -0.048284271))
            Line((3.971715729, -0.048284271), (3.971715729, -0.028284271))
        make_face()
    revolve(axis=Axis((0, 40.052148529, 22.472109732), (1, 0, 0)), revolution_arc=60.310853344, mode=Mode.SUBTRACT)
    with BuildSketch(Plane(origin=(29, 28, 0), x_dir=(0, 0.47417999059673505, 0.8804279280654836), z_dir=(0, 0.8804279280654836, -0.47417999059673505))) as chamfer1_piece_21:
        with BuildLine():
            Line((20.528284271, 0.028284271), (19.471715729, -1.028284271))
            Line((19.471715729, -1.028284271), (19.451715729, -1.028284271))
            ThreePointArc((19.451715729, -1.028284271), (19.48, -0.514142136), (19.48, 0))
            Line((19.48, 0), (19.5, 0.02))
            ThreePointArc((19.5, 0.02), (20.014142136, 0.02), (20.528284271, 0.048284271))
            Line((20.528284271, 0.048284271), (20.528284271, 0.028284271))
        make_face()
    revolve(axis=Axis((29, 28, 0), (1, 0, 0)), revolution_arc=236.611945436, mode=Mode.SUBTRACT)
    with BuildSketch(Plane(origin=(29, 28, 0), x_dir=(0, -0.3209876543209878, 0.9470833784696626), z_dir=(0, -0.9470833784696626, -0.3209876543209878))) as chamfer1_piece_22:
        with BuildLine():
            Line((30.528284271, 1.028284271), (29.471715729, -0.028284271))
            Line((29.471715729, -0.028284271), (29.471715729, -0.048284271))
            ThreePointArc((29.471715729, -0.048284271), (29.985857864, -0.02), (30.5, -0.02))
            Line((30.5, -0.02), (30.52, 0))
            ThreePointArc((30.52, 0), (30.52, 0.514142136), (30.548284271, 1.028284271))
            Line((30.548284271, 1.028284271), (30.528284271, 1.028284271))
        make_face()
    revolve(axis=Axis((29, 28, 0), (-1, 0, 0)), revolution_arc=46.928028915, mode=Mode.SUBTRACT)
    with BuildSketch(Plane(origin=(29, 39.61740977, 21.570484238), x_dir=(0, -0.4741799905967355, -0.8804279280654832), z_dir=(0, -0.8804279280654832, 0.4741799905967355))) as chamfer1_piece_23:
        with BuildLine():
            Line((3.971715729, 0.028284271), (5.028284271, -1.028284271))
            Line((5.028284271, -1.028284271), (5.048284271, -1.028284271))
            ThreePointArc((5.048284271, -1.028284271), (5.02, -0.514142136), (5.02, 0))
            Line((5.02, 0), (5, 0.02))
            ThreePointArc((5, 0.02), (4.485857864, 0.02), (3.971715729, 0.048284271))
            Line((3.971715729, 0.048284271), (3.971715729, 0.028284271))
        make_face()
    revolve(axis=Axis((29, 39.61740977, 21.570484238), (1, 0, 0)), revolution_arc=92.563899679, mode=Mode.SUBTRACT)
    with BuildSketch(Plane(origin=(29, 40.052148529, 22.472109732), x_dir=(0, 0.9007583368811826, -0.4343206402406474), z_dir=(0, -0.4343206402406474, -0.9007583368811826))) as chamfer1_piece_24:
        with BuildLine():
            Line((5.028284271, -1.028284271), (3.971715729, 0.028284271))
            Line((3.971715729, 0.028284271), (3.971715729, 0.048284271))
            ThreePointArc((3.971715729, 0.048284271), (4.485857864, 0.02), (5, 0.02))
            Line((5, 0.02), (5.02, 0))
            ThreePointArc((5.02, 0), (5.02, -0.514142136), (5.048284271, -1.028284271))
            Line((5.048284271, -1.028284271), (5.028284271, -1.028284271))
        make_face()
    revolve(axis=Axis((29, 40.052148529, 22.472109732), (1, 0, 0)), revolution_arc=87.536708668, mode=Mode.SUBTRACT)
    with BuildSketch(Plane(origin=(29, 39.61740977, -21.570484238), x_dir=(0, 0.9007583368811823, 0.4343206402406481), z_dir=(0, 0.4343206402406481, -0.9007583368811823))) as chamfer1_piece_25:
        with BuildLine():
            Line((3.971715729, 0.028284271), (5.028284271, -1.028284271))
            Line((5.028284271, -1.028284271), (5.048284271, -1.028284271))
            ThreePointArc((5.048284271, -1.028284271), (5.02, -0.514142136), (5.02, 0))
            Line((5.02, 0), (5, 0.02))
            ThreePointArc((5, 0.02), (4.485857864, 0.02), (3.971715729, 0.048284271))
            Line((3.971715729, 0.048284271), (3.971715729, 0.028284271))
        make_face()
    revolve(axis=Axis((29, 39.61740977, -21.570484238), (1, 0, 0)), revolution_arc=92.563899679, mode=Mode.SUBTRACT)
    with BuildSketch(Plane(origin=(29, 40.052148529, -22.472109732), x_dir=(0, 0.4726332756600554, -0.8812592051938215), z_dir=(0, -0.8812592051938215, -0.4726332756600554))) as chamfer1_piece_26:
        with BuildLine():
            Line((5.028284271, -1.028284271), (3.971715729, 0.028284271))
            Line((3.971715729, 0.028284271), (3.971715729, 0.048284271))
            ThreePointArc((3.971715729, 0.048284271), (4.485857864, 0.02), (5, 0.02))
            Line((5, 0.02), (5.02, 0))
            ThreePointArc((5.02, 0), (5.02, -0.514142136), (5.048284271, -1.028284271))
            Line((5.048284271, -1.028284271), (5.028284271, -1.028284271))
        make_face()
    revolve(axis=Axis((29, 40.052148529, -22.472109732), (1, 0, 0)), revolution_arc=87.536708668, mode=Mode.SUBTRACT)

    # Chamfer2
    chamfer2_edges = [part.edges().sort_by_distance(p)[0] for p in [
        (29, 39.875, -18.26810334),
        (29, 16.125, -18.26810334),
        (29, 4.25, 2.3),
        (29, 16.125, 22.86810334),
        (29, 39.875, 22.86810334),
    ]]
    chamfer(chamfer2_edges, length=CHAMFER2_SIZE)


solid = part.part
